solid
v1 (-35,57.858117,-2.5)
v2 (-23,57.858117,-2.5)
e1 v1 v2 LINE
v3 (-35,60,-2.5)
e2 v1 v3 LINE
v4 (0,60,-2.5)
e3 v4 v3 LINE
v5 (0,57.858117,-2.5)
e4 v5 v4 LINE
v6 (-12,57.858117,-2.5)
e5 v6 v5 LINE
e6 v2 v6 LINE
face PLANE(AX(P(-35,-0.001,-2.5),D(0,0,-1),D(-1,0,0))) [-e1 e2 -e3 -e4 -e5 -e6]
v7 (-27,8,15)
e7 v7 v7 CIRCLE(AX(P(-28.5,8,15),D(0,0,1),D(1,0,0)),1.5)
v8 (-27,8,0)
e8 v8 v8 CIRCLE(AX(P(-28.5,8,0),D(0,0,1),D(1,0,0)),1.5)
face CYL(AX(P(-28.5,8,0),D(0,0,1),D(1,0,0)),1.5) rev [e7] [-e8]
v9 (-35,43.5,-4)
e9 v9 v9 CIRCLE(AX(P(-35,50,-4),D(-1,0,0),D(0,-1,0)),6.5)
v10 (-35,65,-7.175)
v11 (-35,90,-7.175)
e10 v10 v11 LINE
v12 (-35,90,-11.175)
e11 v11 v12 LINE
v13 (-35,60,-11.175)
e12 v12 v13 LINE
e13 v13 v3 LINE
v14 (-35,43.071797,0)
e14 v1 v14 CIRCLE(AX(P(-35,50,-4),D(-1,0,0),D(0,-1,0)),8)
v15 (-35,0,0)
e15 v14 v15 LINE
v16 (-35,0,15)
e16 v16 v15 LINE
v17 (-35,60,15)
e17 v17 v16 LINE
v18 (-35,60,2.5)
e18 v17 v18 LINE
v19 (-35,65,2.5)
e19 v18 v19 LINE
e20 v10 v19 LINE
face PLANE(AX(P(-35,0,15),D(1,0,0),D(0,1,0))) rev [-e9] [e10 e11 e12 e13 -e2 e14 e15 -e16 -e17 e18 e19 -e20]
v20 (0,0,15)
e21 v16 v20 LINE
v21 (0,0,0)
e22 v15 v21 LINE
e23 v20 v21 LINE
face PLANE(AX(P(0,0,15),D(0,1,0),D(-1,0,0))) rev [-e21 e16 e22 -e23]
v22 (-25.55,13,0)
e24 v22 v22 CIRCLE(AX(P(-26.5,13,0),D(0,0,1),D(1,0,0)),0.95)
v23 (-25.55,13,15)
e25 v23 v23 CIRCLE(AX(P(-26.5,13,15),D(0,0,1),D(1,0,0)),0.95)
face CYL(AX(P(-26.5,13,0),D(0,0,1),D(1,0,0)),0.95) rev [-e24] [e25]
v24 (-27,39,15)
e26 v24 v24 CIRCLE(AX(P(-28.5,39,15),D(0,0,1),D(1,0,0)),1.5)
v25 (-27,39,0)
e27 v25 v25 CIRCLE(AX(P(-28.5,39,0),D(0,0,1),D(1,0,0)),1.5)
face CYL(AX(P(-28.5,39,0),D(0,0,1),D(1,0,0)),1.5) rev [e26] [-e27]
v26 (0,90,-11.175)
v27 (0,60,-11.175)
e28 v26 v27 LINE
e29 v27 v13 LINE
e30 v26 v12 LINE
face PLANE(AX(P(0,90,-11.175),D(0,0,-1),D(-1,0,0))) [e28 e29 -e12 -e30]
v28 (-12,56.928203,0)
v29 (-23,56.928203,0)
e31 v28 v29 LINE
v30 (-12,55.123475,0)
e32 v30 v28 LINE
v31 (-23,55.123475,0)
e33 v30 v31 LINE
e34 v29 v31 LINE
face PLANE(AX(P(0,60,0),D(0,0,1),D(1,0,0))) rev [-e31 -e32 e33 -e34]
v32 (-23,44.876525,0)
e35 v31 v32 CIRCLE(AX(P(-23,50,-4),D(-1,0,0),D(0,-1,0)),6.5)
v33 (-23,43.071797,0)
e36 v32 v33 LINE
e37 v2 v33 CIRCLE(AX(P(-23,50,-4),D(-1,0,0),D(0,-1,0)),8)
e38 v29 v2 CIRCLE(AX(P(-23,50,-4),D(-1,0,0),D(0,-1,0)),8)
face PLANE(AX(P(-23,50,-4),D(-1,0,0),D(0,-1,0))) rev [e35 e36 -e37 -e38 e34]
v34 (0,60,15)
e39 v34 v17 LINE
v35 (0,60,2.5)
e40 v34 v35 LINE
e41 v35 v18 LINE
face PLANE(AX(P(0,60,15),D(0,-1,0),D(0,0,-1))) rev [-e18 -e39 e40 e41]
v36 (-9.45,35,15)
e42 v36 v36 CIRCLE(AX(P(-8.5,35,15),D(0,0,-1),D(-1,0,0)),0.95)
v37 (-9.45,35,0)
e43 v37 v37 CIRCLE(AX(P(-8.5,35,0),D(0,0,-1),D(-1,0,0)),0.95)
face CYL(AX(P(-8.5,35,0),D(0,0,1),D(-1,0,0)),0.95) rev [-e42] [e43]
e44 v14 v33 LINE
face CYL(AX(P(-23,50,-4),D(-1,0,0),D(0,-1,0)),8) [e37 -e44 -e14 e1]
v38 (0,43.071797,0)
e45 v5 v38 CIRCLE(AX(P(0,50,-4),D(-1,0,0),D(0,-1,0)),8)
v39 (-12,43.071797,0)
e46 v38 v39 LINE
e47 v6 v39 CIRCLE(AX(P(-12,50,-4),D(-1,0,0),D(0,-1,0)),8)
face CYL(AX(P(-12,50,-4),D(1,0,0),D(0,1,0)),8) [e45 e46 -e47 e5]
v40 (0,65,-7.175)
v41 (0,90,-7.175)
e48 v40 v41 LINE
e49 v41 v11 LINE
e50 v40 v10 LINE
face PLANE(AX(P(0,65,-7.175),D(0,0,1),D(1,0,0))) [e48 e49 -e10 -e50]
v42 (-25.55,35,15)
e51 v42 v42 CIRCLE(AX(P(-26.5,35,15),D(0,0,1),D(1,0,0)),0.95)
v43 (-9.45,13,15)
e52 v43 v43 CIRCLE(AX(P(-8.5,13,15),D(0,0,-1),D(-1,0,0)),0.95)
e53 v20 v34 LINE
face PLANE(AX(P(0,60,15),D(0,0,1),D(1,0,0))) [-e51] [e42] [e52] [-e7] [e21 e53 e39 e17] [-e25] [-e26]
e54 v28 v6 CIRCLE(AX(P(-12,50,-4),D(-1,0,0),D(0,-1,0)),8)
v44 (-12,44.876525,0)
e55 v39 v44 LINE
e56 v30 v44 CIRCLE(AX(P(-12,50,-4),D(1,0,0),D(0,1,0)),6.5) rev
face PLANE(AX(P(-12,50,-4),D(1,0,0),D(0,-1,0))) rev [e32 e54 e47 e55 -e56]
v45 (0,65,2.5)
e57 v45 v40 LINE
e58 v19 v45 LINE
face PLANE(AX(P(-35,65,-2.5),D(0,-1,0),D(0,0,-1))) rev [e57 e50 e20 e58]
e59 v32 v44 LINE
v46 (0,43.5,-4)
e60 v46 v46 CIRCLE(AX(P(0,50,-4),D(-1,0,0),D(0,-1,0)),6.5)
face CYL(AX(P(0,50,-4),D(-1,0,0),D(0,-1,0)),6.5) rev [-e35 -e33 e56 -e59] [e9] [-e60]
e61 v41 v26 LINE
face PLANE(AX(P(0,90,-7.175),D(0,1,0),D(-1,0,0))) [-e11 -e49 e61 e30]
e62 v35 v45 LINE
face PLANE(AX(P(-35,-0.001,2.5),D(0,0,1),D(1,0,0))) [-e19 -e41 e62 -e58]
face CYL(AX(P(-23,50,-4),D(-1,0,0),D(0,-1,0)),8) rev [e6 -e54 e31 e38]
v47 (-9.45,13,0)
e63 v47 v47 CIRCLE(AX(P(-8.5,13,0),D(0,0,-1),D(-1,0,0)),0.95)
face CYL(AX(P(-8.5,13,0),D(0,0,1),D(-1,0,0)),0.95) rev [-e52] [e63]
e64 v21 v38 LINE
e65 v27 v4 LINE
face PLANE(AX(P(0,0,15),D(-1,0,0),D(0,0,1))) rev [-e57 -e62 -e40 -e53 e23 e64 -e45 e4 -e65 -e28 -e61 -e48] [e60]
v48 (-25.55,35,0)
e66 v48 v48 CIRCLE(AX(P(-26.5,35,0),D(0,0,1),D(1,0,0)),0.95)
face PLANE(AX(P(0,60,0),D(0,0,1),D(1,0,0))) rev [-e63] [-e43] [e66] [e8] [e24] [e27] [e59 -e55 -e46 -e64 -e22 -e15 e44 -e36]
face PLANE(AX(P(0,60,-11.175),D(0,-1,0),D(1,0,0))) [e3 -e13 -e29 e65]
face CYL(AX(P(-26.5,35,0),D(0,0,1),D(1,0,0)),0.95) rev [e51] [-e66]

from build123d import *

# Parameters (mm, degrees)
SKETCH1_W                            = 35
SKETCH1_H                            = 60
BOSS_EXTRUDE1_DEPTH                  = 15
SKETCH2_R                            = 1.5
SKETCH2_R_2                          = 0.95
CUT_EXTRUDE1_DEPTH                   = 72.063352018
MIRROR1_OUTLINE_R                    = 0.95
MIRROR1_DEPTH                        = 15
SKETCH3_R                            = 8
BOSS_EXTRUDE2_DEPTH                  = 12
SKETCH4_R                            = 6.5
CUT_EXTRUDE2_DEPTH                   = 72.063352018
SKETCH5_W                            = 35
SKETCH5_H                            = 5
BOSS_EXTRUDE4_DEPTH                  = 5
BOSS_EXTRUDE4_DIRECTION_2_REACH      = 73.063
BOSS_EXTRUDE4_DIRECTION_2_END_RADIUS = 8
BOSS_EXTRUDE7_DEPTH                  = 35


# Read off the part's stored shape, not the designer's step: Mirror1
with BuildPart() as part:
    # Sketch1 → Boss-Extrude1 (new body)
    with BuildSketch(Plane.XY):
        with Locations((-17.5, 30)):
            Rectangle(SKETCH1_W, SKETCH1_H)
    extrude(amount=BOSS_EXTRUDE1_DEPTH)

    # Sketch2 → Cut-Extrude1 (cut, through all)
    with BuildSketch(Plane.XY.offset(15)):
        with Locations((-28.5, 8)):
            Circle(SKETCH2_R)
        with Locations((-26.5, 13)):
            Circle(SKETCH2_R_2)
        with Locations((-26.5, 35)):
            Circle(SKETCH2_R_2)
        with Locations((-28.5, 39)):
            Circle(SKETCH2_R)
    extrude(amount=-CUT_EXTRUDE1_DEPTH, mode=Mode.SUBTRACT)

    # Mirror1 outline → Mirror1 (cut)
    with BuildSketch(Plane.XY):
        with Locations((-8.5, 35)):
            Circle(MIRROR1_OUTLINE_R)
        with Locations((-8.5, 13)):
            Circle(MIRROR1_OUTLINE_R)
    extrude(amount=MIRROR1_DEPTH, mode=Mode.SUBTRACT)

    # Sketch3 → Boss-Extrude2 (add)
    with BuildSketch(Plane.ZY.offset(35)):
        with Locations((-4, 50)):
            Circle(SKETCH3_R)
    boss_extrude2 = extrude(amount=-BOSS_EXTRUDE2_DEPTH)

    # Sketch4 → Cut-Extrude2 (cut, through all)
    with BuildSketch(Plane.ZY.offset(35)):
        with Locations(Location((-4, 50, 0), (0, 0, 270))):
            Circle(SKETCH4_R)
    cut_extrude2 = extrude(amount=-CUT_EXTRUDE2_DEPTH, mode=Mode.SUBTRACT)

    # Mirror2: Boss-Extrude2, Cut-Extrude2 across plane
    add(boss_extrude2.mirror(Plane(origin=(-17.5, 0, 0), x_dir=(0, 0, 1), z_dir=(1, 0, 0))))
    add(cut_extrude2.mirror(Plane(origin=(-17.5, 0, 0), x_dir=(0, 0, 1), z_dir=(1, 0, 0))), mode=Mode.SUBTRACT)

    # Sketch5 → Boss-Extrude4 (add)
    with BuildSketch(Plane(origin=(0, 60, 0), x_dir=(1, 0, 0), z_dir=(0, 1, 0))):
        with Locations((-17.5, 0)):
            Rectangle(SKETCH5_W, SKETCH5_H)
    extrude(amount=BOSS_EXTRUDE4_DEPTH)

    # Boss-Extrude4 direction 2: up to this cylinder (the profile starts outside it)
    boss_extrude4_direction_2_end = Plane(origin=(-17.5, 50, -4), z_dir=(-1, 0, 0)) * Cylinder(BOSS_EXTRUDE4_DIRECTION_2_END_RADIUS, 163.126, mode=Mode.PRIVATE)
    # Sketch5 → Boss-Extrude4 direction 2 (add, up to the surface)
    with BuildSketch(Plane(origin=(0, 60, 0), x_dir=(1, 0, 0), z_dir=(0, 1, 0)), mode=Mode.PRIVATE) as boss_extrude4_direction_2_sk1:
        with Locations((-17.5, 0)):
            Rectangle(SKETCH5_W, SKETCH5_H)
    boss_extrude4_direction_2_tool1 = extrude(boss_extrude4_direction_2_sk1.sketch, amount=-BOSS_EXTRUDE4_DIRECTION_2_REACH, mode=Mode.PRIVATE) - boss_extrude4_direction_2_end
    add(boss_extrude4_direction_2_tool1.solids().sort_by_distance((-17.5, 60, 0))[0])

    # Sketch12 → Boss-Extrude7 (add, through all)
    with BuildSketch(Plane.ZY.offset(35)):
        Polygon((-2.5, 65), (-7.175, 65), (-7.175, 90), (-11.175, 90), (-11.175, 60), (-2.5, 60), align=None)
    extrude(amount=-BOSS_EXTRUDE7_DEPTH)


solid = part.part
